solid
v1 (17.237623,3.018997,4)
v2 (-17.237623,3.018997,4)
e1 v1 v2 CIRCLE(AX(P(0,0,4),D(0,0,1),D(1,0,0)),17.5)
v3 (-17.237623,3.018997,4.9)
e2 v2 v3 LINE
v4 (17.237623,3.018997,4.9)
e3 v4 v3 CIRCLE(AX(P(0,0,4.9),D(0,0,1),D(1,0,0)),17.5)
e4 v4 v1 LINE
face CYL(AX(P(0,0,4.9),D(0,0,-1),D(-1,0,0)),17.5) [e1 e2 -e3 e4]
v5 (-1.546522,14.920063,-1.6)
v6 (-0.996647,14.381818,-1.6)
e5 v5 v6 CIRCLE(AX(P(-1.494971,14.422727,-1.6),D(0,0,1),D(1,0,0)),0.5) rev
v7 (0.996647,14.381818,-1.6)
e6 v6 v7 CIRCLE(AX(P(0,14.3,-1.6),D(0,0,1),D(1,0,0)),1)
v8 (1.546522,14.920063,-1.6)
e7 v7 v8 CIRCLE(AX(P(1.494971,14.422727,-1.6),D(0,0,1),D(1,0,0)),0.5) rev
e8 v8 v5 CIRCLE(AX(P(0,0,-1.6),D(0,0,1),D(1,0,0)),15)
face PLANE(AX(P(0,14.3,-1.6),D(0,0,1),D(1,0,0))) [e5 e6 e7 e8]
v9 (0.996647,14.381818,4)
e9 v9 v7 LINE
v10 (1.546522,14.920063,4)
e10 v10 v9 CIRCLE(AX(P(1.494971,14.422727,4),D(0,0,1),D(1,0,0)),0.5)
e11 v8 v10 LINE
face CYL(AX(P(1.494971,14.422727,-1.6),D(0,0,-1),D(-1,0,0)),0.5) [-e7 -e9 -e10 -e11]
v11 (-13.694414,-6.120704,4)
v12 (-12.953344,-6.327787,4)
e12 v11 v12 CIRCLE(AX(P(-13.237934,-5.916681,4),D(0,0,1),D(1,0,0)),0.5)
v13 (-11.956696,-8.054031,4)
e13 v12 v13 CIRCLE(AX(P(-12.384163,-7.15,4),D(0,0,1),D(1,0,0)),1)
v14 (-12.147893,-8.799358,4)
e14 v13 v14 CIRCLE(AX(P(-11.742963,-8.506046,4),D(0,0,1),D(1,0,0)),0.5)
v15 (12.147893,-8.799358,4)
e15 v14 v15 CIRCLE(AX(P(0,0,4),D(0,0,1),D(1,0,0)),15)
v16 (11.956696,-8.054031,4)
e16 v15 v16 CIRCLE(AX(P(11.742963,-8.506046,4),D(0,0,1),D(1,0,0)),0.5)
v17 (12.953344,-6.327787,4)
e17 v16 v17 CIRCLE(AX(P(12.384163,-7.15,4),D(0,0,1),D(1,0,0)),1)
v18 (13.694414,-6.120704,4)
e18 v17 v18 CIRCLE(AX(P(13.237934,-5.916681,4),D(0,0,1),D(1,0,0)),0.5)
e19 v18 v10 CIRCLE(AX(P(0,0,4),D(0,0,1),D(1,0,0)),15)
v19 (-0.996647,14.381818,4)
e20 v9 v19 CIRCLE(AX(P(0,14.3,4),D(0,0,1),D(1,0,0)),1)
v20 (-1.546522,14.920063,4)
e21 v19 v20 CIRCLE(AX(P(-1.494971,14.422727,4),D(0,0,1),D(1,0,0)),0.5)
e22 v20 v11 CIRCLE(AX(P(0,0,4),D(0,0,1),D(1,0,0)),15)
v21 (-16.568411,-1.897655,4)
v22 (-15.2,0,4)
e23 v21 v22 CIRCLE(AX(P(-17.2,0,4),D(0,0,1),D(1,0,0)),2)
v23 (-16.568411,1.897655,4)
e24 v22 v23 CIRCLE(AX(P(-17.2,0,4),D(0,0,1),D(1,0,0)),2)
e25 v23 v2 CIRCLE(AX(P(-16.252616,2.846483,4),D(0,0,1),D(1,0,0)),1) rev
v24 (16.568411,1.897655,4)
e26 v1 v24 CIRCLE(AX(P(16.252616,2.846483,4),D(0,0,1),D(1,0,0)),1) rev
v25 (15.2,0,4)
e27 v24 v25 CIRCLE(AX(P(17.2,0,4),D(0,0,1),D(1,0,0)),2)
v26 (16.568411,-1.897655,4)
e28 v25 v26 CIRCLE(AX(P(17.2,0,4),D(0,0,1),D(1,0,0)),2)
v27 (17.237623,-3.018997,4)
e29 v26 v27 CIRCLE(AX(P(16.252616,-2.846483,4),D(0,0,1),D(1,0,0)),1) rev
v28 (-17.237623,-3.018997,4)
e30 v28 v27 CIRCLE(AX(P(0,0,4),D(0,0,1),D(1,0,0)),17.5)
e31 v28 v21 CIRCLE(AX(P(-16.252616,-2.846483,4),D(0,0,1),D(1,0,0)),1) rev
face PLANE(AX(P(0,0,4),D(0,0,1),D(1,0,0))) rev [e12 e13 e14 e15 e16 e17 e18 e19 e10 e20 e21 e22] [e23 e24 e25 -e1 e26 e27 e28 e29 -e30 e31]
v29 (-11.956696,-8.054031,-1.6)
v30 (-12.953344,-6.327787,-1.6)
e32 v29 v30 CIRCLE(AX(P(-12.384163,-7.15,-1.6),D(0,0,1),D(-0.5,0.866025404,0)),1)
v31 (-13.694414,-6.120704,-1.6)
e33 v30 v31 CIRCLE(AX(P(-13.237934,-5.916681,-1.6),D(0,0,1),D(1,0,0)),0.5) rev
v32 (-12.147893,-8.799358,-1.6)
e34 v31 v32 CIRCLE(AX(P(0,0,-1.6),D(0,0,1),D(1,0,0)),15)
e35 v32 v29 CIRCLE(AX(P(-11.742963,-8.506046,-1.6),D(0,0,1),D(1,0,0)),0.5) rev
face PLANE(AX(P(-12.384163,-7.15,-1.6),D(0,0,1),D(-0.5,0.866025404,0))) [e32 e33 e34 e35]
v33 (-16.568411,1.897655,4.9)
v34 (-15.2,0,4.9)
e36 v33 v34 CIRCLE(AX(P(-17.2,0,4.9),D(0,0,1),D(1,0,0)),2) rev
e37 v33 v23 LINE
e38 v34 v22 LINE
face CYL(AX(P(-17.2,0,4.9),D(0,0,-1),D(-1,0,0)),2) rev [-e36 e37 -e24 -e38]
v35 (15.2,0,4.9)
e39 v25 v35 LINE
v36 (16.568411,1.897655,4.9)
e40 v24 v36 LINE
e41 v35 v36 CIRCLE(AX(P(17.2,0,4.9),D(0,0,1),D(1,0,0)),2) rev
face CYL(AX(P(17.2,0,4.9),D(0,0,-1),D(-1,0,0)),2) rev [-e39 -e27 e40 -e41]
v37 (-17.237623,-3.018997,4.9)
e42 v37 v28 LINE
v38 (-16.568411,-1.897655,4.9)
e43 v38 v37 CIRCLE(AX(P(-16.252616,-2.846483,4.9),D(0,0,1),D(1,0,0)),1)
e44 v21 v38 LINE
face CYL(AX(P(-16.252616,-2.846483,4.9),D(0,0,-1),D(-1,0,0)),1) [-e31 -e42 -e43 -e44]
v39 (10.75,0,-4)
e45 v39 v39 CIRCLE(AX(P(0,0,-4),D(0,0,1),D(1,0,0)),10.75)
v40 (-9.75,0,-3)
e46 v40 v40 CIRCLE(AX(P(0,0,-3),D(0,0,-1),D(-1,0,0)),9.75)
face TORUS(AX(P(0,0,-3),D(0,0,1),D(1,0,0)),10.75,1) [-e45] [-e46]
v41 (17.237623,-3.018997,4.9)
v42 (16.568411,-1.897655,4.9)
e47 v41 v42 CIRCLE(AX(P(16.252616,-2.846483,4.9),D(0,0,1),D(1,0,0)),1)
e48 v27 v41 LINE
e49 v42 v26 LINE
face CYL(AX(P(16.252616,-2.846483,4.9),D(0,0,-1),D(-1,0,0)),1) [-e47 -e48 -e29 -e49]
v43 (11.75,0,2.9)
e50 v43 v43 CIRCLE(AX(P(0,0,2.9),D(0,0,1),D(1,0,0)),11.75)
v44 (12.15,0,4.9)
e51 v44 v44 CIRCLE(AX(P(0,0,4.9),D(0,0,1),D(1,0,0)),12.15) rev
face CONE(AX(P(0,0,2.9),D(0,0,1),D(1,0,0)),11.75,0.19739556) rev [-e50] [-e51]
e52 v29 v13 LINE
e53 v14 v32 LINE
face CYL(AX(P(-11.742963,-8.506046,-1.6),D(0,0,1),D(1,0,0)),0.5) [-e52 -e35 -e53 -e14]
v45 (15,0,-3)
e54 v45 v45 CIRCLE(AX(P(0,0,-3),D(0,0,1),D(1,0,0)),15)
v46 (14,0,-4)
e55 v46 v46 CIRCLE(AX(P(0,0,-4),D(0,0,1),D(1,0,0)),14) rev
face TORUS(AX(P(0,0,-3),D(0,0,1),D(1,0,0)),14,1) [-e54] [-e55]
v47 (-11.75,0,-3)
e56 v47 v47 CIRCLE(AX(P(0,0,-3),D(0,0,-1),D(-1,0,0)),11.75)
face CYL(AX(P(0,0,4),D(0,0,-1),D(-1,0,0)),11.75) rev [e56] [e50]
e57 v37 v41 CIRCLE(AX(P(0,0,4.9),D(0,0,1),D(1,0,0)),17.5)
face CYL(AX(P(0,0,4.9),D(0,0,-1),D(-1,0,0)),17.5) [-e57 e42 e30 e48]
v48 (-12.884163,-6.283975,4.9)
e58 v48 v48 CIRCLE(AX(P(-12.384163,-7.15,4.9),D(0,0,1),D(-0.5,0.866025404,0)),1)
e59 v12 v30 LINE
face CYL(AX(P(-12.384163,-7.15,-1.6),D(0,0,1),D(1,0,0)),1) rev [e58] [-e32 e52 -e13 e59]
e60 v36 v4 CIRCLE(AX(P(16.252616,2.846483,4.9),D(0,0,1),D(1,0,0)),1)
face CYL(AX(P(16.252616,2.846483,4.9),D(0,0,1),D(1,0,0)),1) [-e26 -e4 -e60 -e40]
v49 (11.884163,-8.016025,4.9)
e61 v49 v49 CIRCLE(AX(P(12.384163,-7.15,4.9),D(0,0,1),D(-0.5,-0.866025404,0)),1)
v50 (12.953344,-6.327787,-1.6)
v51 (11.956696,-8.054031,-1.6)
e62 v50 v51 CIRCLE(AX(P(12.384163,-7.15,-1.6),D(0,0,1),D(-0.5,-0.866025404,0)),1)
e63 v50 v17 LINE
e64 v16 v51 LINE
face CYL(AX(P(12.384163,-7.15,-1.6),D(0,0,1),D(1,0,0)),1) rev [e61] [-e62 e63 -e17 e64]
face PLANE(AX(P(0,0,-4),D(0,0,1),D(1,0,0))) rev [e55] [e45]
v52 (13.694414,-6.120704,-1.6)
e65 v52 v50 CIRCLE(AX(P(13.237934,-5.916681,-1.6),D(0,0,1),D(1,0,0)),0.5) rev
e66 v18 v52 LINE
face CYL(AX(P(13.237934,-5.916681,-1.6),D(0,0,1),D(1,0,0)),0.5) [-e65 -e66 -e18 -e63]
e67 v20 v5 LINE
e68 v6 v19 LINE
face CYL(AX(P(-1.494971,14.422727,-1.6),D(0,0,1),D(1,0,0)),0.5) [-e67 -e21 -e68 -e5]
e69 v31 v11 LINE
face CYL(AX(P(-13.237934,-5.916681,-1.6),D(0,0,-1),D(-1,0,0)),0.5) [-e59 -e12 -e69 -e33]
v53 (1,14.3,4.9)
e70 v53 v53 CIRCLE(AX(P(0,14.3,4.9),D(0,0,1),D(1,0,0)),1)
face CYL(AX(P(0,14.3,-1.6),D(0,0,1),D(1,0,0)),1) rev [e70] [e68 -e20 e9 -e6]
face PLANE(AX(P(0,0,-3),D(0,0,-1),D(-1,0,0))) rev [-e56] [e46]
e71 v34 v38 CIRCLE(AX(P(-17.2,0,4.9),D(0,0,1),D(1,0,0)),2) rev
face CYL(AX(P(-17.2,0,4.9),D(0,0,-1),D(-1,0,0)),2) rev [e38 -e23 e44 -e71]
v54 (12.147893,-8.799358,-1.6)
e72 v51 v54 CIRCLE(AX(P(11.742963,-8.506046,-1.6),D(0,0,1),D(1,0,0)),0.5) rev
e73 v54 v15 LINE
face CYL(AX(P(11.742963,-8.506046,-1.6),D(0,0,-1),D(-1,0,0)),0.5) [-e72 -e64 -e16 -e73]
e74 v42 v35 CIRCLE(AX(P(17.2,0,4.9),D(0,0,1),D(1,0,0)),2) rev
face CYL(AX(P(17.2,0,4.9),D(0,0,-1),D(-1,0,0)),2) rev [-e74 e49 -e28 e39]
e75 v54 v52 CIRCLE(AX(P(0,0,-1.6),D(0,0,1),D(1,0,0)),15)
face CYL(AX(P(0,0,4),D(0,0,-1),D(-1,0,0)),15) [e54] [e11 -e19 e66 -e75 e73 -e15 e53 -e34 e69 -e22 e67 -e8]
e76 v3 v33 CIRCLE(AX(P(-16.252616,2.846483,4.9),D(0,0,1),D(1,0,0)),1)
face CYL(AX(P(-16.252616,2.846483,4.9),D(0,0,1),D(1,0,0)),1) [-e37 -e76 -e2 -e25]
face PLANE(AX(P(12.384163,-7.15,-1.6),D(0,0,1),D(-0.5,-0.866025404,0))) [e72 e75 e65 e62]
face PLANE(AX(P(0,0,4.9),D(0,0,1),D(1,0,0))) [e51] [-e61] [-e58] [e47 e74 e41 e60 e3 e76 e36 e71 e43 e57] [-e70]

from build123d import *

# Parameters (mm, degrees)
SKETCH_1_R               = 15
SKETCH_1_R_2             = 11.75
EXTRUDE_1_DEPTH          = 4
SKETCH_2_R               = 11.75
SKETCH_2_R_2             = 9.75
EXTRUDE_2_DEPTH          = 1
FILLET_1_R               = 1
FILLET_2_R               = 1
SKETCH_3_R               = 17.5
SKETCH_3_R_2             = 11.75
EXTRUDE_3_DEPTH          = 0.9
CUT_EXTRUDE_1_DEPTH      = 27.009613607
FILLET_3_R               = 2
FILLET_4_R               = 1
SKETCH_6_R               = 1
CUT_EXTRUDE_2_DEPTH      = 6.5
PATTERN_CIRCULAR_2_COUNT = 3
FILLET_6_R               = 0.5
CHAMFER_1_SIZE           = 0.4
CHAMFER_1_SIZE2          = 2


# Some blends are built 0.0001 mm under size
with BuildPart() as part:
    # 草图1 → 凸台-拉伸1 (new, symmetric)
    with BuildSketch(Plane.XY):
        Circle(SKETCH_1_R)
        Circle(SKETCH_1_R_2, mode=Mode.SUBTRACT)
    extrude(amount=EXTRUDE_1_DEPTH, both=True)

    # 草图2 → 凸台-拉伸2 (add)
    with BuildSketch(Plane(origin=(0, 0, -4), x_dir=(-1, 0, 0), z_dir=(0, 0, -1))):
        Circle(SKETCH_2_R)
        Circle(SKETCH_2_R_2, mode=Mode.SUBTRACT)
    extrude(amount=-EXTRUDE_2_DEPTH)

    # 圆角1
    fillet_1_edges = [part.edges().sort_by_distance(p)[0] for p in [
        (-15, 0, -4),
    ]]
    fillet(fillet_1_edges, radius=FILLET_1_R)

    # 圆角2
    fillet_2_edges = [part.edges().sort_by_distance(p)[0] for p in [
        (9.75, 0, -4),
    ]]
    fillet(fillet_2_edges, radius=FILLET_2_R - 0.0001)  # a hair under: the kernel refuses the full size

    # 草图3 → 凸台-拉伸3 (add)
    with BuildSketch(Plane.XY.offset(4)):
        Circle(SKETCH_3_R)
        with Locations(Location((0, 0, 0), (0, 0, 180))):
            Circle(SKETCH_3_R_2, mode=Mode.SUBTRACT)
    extrude(amount=EXTRUDE_3_DEPTH)

    # 草图4 → 切除-拉伸1 (cut, through all)
    with BuildSketch(Plane(origin=(0, 0, 4), x_dir=(-1, 0, 0), z_dir=(0, 0, -1))):
        with BuildLine():
            Line((-20.056660766, 2), (-15.067846561, 2))
            ThreePointArc((-15.067846561, 2), (-15.2, 0), (-15.067846561, -2))
            Line((-15.067846561, -2), (-20.056660766, -2))
            Line((-20.056660766, -2), (-20.056660766, 2))
        make_face()
    cut_extrude_1 = extrude(amount=-CUT_EXTRUDE_1_DEPTH, mode=Mode.SUBTRACT)

    # 镜向1: 切除-拉伸1 across plane
    add(cut_extrude_1.mirror(Plane(origin=(0, 0, 0), x_dir=(0, 0, 1), z_dir=(1, 0, 0))), mode=Mode.SUBTRACT)

    # 圆角3
    fillet_3_edges = [part.edges().sort_by_distance(p)[0] for p in [
        (-15.067846561, -2, 4.45),
        (-15.067846561, 2, 4.45),
        (15.067846561, -2, 4.45),
        (15.067846561, 2, 4.45),
    ]]
    fillet(fillet_3_edges, radius=FILLET_3_R - 0.0001)  # a hair under: the kernel refuses the full size

    # 圆角4
    fillet_4_edges = [part.edges().sort_by_distance(p)[0] for p in [
        (17.385338651, 2, 4.45),
        (17.385338651, -2, 4.45),
        (-17.385338651, -2, 4.45),
        (-17.385338651, 2, 4.45),
    ]]
    fillet(fillet_4_edges, radius=FILLET_4_R)

    # 草图6 → 切除-拉伸2 (cut)
    with BuildSketch(Plane.XY.offset(4.9)):
        with Locations((0, 14.3)):
            Circle(SKETCH_6_R)
    cut_extrude_2 = extrude(amount=-CUT_EXTRUDE_2_DEPTH, mode=Mode.SUBTRACT)

    # 阵列(圆周)2: 切除-拉伸2 ×3 about axis
    pattern_circular_2_axis = Axis((0, 0, 0), (0, 0, 1))
    for i in range(1, PATTERN_CIRCULAR_2_COUNT):
        add(cut_extrude_2.rotate(pattern_circular_2_axis, i * 360 / PATTERN_CIRCULAR_2_COUNT), mode=Mode.SUBTRACT)

    # 圆角6
    # the kernel refuses this fillet: 0.5 mm, written as the material it takes off along each edge
    with BuildSketch(Plane(origin=(-0.73119563, 14.982167832, -1.6), x_dir=(-0.997111465428935, -0.07595212643607639, 0), z_dir=(0, 0, 1)), Plane(origin=(13.340535761, -6.857849926, -1.6), x_dir=(0.4327792617493751, 0.9014999226842262, 0), z_dir=(0, 0, 1)), Plane(origin=(-12.609340132, -8.124317906, -1.6), x_dir=(0.5643322036795584, -0.8255477962481478, 0), z_dir=(0, 0, 1))) as fillet_6_piece_1:
        with BuildLine():
            CenterArc((0.804059787, 0.49981424), FILLET_6_R, 170.950986261, 100.610876057)
            ThreePointArc((0.310282709, 0.578453903), (0.203956844, 0.26304232), (0, 0))
            ThreePointArc((0, 0), (0.40884396, -0.005572815), (0.817687919, 0))
        make_face()
    extrude(amount=5.6, mode=Mode.SUBTRACT)
    with BuildSketch(Plane(origin=(0.73119563, 14.982167832, -1.6), x_dir=(0.997111465428935, -0.07595212643607635, 0), z_dir=(0, 0, 1)), Plane(origin=(12.609340132, -8.124317906, -1.6), x_dir=(-0.5643322036795624, -0.825547796248145, 0), z_dir=(0, 0, 1)), Plane(origin=(-13.340535761, -6.857849926, -1.6), x_dir=(-0.4327792617493753, 0.9014999226842261, 0), z_dir=(0, 0, 1))) as fillet_6_piece_2:
        with BuildLine():
            CenterArc((0.804059787, -0.49981424), FILLET_6_R, 88.438137682, 100.610876057)
            ThreePointArc((0.310282709, -0.578453903), (0.203956844, -0.26304232), (0, 0))
            ThreePointArc((0, 0), (0.40884396, 0.005572815), (0.817687919, 0))
        make_face()
    extrude(amount=5.6, mode=Mode.SUBTRACT)

    # 倒角1
    chamfer_1_edges = [part.edges().sort_by_distance(p)[0] for p in [
        (11.75, 0, 4.9),
    ]]
    chamfer_1_side = [part.faces().sort_by_distance(p)[0] for p in [
        (15.179125182, 1.457318687, 4.9),
    ]]
    chamfer(chamfer_1_edges, length=CHAMFER_1_SIZE, length2=CHAMFER_1_SIZE2, reference=chamfer_1_side[0])


solid = part.part
